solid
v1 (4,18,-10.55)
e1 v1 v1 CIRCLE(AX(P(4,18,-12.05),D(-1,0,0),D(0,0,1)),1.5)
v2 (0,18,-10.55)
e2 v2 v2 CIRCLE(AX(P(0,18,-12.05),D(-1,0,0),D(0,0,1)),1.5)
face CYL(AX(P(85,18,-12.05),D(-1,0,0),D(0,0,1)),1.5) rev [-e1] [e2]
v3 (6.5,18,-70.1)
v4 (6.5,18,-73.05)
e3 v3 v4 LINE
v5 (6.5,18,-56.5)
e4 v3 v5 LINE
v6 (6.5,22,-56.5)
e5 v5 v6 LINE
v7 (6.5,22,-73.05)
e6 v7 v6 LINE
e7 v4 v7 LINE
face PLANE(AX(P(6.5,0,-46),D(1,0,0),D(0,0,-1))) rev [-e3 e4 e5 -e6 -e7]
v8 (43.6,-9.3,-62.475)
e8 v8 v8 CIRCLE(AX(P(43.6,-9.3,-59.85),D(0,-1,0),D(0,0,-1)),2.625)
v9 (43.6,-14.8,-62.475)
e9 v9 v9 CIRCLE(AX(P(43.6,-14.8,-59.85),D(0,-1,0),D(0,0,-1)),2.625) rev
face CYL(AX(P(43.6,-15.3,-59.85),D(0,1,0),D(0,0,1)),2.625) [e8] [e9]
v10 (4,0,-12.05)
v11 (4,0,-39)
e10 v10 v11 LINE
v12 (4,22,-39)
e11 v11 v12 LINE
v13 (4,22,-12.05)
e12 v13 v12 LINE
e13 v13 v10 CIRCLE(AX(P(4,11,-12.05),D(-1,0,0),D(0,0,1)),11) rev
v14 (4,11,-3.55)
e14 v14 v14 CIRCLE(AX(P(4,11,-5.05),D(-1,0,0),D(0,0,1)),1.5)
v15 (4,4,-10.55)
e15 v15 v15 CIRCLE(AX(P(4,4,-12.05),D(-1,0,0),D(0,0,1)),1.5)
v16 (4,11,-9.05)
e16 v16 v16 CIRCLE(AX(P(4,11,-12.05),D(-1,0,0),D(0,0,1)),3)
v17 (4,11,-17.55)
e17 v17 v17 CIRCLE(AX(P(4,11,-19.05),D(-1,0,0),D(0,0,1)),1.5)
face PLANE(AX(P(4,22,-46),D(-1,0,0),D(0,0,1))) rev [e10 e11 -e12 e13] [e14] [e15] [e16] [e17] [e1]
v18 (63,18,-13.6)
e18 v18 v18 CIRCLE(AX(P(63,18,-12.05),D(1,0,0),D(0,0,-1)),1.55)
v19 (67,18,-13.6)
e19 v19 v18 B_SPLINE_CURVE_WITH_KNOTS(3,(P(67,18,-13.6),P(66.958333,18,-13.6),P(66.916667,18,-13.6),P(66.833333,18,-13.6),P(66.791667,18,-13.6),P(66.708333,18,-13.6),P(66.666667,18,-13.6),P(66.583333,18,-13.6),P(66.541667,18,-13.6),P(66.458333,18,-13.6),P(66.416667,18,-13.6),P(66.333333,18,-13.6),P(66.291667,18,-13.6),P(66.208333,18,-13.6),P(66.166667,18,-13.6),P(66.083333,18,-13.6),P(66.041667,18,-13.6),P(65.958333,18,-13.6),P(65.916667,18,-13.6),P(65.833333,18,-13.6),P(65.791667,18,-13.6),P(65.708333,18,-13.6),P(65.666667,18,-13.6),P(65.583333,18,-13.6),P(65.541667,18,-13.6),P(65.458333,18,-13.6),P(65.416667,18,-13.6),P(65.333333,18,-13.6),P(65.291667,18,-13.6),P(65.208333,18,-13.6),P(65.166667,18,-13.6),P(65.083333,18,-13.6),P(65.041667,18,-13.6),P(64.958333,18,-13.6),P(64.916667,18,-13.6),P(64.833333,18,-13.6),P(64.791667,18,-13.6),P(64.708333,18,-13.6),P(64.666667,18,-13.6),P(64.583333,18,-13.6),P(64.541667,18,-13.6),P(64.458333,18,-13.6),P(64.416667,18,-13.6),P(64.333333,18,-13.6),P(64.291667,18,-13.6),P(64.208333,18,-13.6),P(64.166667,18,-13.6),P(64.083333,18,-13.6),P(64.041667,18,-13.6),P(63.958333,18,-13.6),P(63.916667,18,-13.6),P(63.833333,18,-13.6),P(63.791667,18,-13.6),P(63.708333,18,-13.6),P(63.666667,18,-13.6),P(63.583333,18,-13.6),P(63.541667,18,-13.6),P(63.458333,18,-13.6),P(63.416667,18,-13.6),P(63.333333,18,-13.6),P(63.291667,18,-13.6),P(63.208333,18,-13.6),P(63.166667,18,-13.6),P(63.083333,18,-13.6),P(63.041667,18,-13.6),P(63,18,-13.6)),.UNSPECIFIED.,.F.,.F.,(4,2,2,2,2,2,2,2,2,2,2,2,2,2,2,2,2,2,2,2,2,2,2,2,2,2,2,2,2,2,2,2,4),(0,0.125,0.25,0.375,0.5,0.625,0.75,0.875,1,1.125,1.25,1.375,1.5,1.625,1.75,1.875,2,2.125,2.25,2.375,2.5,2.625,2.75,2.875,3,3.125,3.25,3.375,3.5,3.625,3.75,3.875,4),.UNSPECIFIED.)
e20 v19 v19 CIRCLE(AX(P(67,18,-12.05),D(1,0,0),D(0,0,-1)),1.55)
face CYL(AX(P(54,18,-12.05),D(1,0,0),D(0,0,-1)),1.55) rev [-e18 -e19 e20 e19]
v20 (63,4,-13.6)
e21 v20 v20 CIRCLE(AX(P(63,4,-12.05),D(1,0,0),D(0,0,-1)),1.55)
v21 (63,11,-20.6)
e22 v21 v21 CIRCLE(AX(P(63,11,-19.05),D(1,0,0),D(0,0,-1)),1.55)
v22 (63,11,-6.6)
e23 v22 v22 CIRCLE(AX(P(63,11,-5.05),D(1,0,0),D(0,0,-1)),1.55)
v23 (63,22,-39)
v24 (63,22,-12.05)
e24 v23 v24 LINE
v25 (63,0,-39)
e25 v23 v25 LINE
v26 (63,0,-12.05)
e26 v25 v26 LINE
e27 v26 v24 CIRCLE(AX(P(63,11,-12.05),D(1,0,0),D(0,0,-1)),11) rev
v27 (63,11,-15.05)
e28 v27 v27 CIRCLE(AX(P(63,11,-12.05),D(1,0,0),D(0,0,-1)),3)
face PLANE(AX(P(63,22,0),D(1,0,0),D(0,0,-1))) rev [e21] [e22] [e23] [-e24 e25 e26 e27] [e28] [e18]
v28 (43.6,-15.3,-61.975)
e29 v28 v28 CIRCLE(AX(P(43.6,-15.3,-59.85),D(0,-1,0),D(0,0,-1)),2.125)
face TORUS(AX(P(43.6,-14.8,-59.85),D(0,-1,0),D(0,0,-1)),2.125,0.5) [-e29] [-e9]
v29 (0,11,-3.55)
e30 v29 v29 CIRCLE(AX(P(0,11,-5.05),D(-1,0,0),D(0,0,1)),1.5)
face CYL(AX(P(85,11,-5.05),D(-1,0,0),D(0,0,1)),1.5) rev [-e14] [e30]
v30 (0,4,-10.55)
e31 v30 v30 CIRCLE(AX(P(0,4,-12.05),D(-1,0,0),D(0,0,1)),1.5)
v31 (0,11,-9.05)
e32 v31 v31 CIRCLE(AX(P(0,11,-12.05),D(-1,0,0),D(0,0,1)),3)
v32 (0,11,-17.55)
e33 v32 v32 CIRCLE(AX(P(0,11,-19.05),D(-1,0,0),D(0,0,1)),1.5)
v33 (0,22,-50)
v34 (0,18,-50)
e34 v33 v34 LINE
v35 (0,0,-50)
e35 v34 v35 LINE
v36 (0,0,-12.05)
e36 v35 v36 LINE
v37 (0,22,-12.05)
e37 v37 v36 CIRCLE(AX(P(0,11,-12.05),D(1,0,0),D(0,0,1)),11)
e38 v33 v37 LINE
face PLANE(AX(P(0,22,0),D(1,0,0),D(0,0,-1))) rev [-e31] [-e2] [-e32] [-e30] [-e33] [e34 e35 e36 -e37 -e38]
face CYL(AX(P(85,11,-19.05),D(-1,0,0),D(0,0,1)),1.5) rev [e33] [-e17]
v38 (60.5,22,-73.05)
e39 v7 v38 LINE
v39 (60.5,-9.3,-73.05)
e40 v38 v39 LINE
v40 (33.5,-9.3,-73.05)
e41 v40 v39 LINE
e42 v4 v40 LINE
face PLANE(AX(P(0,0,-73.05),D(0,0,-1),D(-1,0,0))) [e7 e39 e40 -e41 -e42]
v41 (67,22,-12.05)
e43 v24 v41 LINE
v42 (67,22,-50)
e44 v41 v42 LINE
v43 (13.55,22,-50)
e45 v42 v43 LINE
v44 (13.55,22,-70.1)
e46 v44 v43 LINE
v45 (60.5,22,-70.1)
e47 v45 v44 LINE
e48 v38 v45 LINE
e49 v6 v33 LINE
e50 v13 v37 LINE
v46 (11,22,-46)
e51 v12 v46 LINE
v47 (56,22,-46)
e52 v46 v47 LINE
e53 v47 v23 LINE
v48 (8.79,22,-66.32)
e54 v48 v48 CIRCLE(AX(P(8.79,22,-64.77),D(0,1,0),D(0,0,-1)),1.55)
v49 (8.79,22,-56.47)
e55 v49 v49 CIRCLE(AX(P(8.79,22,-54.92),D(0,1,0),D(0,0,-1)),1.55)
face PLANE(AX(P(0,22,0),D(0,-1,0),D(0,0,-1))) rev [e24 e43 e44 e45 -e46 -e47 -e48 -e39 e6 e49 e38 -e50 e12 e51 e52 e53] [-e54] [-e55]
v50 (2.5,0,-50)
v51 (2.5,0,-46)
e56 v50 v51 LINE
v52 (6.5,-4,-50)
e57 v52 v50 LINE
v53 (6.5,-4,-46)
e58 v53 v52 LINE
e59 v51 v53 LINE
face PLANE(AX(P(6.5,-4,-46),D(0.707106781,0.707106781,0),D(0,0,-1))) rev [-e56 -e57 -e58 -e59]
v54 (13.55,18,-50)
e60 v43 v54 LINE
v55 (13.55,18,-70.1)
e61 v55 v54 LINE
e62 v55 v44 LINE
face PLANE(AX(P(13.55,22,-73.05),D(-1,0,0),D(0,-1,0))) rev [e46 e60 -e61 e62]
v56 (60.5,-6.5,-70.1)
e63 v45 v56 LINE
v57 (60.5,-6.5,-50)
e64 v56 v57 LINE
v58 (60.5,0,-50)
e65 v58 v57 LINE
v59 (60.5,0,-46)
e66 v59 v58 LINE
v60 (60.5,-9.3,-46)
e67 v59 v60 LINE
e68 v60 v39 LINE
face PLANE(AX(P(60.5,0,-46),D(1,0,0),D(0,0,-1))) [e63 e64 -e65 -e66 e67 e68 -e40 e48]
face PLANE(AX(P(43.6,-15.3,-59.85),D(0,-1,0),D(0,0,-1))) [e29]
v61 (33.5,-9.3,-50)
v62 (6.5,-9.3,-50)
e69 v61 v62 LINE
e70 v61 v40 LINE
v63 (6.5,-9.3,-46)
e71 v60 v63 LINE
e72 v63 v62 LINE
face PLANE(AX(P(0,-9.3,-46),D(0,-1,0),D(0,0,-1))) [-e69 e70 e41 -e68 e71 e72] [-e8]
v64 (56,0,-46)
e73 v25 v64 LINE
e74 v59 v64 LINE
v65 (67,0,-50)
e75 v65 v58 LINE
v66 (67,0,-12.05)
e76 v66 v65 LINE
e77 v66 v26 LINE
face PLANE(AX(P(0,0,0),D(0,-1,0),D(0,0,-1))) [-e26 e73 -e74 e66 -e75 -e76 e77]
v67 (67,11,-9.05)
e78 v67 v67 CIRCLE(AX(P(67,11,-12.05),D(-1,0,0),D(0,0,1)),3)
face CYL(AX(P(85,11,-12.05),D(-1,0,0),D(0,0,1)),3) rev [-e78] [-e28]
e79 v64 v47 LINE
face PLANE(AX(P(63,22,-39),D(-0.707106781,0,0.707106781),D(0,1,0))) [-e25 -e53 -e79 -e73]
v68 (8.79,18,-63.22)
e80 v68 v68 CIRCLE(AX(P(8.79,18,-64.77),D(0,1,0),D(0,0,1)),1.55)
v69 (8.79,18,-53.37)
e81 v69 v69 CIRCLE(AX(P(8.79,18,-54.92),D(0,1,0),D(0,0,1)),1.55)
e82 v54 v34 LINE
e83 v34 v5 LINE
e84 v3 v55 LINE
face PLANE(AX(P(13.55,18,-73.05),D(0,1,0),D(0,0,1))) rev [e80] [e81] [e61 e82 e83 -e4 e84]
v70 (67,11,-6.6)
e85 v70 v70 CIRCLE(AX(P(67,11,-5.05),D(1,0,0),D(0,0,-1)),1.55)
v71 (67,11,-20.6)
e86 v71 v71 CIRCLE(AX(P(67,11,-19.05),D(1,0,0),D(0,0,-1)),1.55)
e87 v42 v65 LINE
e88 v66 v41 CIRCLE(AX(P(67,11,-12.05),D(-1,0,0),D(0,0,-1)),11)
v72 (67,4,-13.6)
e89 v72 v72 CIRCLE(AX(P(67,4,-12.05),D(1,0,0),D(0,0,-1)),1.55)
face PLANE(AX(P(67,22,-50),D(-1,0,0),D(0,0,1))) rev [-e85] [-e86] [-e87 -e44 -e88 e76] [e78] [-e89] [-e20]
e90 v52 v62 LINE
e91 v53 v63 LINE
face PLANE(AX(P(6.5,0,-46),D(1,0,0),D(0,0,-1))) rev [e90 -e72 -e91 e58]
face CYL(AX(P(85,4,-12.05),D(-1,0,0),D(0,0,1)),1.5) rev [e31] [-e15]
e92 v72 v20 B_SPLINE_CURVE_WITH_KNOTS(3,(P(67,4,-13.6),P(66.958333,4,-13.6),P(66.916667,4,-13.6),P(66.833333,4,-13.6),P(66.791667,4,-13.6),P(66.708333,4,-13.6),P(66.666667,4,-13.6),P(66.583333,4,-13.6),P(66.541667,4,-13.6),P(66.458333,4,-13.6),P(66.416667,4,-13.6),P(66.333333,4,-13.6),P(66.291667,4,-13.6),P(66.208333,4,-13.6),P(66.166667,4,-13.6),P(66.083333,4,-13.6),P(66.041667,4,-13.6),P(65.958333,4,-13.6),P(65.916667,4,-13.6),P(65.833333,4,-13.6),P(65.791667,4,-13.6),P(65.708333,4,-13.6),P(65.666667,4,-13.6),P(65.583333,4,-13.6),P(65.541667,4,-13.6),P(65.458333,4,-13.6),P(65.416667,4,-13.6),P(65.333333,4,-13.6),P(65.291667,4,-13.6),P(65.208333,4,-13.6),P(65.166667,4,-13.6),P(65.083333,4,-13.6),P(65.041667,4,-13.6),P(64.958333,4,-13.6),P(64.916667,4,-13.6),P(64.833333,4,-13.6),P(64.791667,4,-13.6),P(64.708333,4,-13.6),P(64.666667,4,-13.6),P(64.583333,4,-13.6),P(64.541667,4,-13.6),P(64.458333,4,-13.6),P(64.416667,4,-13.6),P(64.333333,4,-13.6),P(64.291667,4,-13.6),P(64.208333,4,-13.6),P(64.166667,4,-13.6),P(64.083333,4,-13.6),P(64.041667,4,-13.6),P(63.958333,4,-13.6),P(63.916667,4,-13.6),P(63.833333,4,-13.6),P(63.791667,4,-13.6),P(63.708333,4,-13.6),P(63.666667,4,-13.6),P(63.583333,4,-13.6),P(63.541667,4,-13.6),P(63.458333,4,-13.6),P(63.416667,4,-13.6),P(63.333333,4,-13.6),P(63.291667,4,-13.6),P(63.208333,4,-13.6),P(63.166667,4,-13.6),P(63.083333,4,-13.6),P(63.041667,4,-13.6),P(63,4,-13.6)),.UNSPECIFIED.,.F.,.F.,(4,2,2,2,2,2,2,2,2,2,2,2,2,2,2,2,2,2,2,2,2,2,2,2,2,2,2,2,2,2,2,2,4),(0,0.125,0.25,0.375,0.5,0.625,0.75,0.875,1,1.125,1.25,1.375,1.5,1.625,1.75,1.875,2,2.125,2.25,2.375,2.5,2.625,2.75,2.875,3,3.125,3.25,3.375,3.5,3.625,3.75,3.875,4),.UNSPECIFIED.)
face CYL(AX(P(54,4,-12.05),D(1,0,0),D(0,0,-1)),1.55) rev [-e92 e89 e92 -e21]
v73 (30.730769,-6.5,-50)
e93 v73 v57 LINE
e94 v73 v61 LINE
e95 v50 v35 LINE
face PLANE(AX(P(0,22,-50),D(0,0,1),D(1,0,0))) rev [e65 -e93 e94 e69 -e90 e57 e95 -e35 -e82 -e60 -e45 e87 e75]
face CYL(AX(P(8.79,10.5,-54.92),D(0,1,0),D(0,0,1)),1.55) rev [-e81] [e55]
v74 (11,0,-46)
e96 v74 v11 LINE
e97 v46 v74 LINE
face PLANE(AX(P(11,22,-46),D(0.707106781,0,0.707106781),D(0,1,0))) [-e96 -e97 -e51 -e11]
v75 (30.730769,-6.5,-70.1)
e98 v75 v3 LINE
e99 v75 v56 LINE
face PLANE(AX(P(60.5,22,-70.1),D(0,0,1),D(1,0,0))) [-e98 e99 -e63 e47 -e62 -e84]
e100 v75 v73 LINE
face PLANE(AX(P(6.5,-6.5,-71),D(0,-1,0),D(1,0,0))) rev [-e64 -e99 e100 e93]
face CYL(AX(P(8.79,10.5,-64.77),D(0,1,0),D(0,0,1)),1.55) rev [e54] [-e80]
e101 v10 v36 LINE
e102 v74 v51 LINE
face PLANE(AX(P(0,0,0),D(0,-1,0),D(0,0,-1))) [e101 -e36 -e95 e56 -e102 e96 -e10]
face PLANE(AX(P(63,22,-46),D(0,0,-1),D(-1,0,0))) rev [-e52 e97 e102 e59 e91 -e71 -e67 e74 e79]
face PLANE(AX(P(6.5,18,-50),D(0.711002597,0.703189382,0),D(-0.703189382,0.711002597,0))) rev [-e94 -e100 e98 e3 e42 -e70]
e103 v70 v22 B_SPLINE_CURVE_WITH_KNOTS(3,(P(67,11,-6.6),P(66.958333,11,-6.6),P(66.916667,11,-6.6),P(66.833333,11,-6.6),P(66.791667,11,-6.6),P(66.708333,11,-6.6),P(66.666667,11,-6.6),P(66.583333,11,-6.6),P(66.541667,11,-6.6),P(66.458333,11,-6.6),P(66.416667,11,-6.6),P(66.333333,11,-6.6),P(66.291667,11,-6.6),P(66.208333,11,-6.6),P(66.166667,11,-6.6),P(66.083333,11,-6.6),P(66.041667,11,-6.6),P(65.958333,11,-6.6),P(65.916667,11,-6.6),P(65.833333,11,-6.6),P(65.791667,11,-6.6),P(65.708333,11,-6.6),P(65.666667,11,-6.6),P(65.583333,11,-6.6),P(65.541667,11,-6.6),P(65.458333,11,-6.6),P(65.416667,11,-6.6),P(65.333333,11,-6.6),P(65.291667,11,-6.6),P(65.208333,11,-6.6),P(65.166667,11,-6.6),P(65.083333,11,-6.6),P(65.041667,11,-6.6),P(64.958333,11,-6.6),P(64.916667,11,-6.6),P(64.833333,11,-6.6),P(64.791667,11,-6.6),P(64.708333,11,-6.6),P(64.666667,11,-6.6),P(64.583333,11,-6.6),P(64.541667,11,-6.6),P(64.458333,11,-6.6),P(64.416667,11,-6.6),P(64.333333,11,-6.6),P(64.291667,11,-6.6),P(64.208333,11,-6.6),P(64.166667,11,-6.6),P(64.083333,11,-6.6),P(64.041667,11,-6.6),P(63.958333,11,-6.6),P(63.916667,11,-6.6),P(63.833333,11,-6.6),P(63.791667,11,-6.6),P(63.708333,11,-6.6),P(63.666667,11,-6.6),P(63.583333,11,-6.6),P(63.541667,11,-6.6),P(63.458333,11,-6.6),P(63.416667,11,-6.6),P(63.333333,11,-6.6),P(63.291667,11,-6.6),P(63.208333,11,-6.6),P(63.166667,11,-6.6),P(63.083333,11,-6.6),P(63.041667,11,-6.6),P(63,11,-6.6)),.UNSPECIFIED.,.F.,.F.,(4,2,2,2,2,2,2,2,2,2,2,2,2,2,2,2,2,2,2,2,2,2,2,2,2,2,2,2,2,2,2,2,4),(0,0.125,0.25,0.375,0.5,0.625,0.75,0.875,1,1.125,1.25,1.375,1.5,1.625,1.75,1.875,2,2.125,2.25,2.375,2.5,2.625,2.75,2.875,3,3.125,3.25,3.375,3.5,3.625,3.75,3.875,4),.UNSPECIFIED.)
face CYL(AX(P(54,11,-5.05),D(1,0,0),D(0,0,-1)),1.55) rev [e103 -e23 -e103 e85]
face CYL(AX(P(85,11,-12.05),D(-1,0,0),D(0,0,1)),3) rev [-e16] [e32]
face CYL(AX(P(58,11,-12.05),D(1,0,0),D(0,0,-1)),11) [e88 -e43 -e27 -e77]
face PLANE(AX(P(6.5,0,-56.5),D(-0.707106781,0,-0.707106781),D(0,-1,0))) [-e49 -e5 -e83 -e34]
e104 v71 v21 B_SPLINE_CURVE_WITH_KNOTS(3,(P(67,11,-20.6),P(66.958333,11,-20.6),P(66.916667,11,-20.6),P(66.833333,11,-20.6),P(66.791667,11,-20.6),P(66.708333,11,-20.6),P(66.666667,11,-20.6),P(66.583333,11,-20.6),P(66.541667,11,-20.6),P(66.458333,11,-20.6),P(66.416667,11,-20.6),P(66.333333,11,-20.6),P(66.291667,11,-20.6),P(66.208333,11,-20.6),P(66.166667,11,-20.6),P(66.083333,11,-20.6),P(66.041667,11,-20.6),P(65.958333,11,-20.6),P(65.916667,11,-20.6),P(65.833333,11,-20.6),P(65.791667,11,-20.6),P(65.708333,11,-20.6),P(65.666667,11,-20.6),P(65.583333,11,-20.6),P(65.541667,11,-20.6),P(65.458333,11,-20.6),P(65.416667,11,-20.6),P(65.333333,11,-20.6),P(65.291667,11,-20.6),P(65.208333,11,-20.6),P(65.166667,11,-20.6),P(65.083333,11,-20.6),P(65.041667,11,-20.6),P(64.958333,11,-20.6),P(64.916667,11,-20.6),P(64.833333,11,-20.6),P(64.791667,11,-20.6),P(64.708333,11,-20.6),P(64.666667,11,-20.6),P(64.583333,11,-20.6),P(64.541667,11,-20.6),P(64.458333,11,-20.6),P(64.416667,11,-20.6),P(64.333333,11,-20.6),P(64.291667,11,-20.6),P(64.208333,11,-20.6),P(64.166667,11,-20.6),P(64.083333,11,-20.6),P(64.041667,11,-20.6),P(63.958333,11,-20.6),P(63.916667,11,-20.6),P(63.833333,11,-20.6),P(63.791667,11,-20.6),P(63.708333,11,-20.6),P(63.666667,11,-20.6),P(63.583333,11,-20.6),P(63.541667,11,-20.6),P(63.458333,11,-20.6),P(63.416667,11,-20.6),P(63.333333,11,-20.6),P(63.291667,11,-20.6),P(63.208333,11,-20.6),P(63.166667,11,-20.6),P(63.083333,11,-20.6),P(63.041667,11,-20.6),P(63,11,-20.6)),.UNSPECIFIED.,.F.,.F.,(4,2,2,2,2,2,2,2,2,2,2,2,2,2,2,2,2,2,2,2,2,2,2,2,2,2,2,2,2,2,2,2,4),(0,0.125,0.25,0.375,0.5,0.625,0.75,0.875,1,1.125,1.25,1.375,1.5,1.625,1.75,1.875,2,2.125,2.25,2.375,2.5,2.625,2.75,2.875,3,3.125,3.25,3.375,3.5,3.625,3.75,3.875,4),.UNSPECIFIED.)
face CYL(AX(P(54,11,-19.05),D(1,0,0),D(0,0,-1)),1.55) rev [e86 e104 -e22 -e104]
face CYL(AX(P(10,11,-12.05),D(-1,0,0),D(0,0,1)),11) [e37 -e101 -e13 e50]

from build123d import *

# Parameters (mm, degrees)
BOSS_EXTRUDE1_DEPTH      = 22
SKETCH3_R                = 1.55
CUT_EXTRUDE1_DEPTH       = 30
CUT_EXTRUDE5_DEPTH       = 9
SKETCH11_R               = 1.55
CUT_EXTRUDE10_DEPTH      = 13
CUT_EXTRUDE11_START      = -10
CUT_EXTRUDE11_DEPTH      = 10
SKETCH13_R               = 3
SKETCH13_R_2             = 1.5
CUT_EXTRUDE12_DEPTH      = 85
FILLET1_SIZE             = 7
SKETCH14_W               = 54
SKETCH14_H               = 9.3
SKETCH14_W_2             = 7.05
SKETCH14_H_2             = 4
BOSS_EXTRUDE4_DEPTH      = 4
SKETCH17_W               = 7.05
SKETCH17_H               = 4
BOSS_EXTRUDE5_DEPTH      = 23.05
BOSS_EXTRUDE6_DEPTH      = 27.3
BOSS_EXTRUDE6_DEPTH_BACK = 4
SKETCH18_W               = 54
SKETCH18_H               = 2.95
SKETCH19_W               = 54
SKETCH19_H               = 2.8
BOSS_EXTRUDE7_DEPTH      = 21
FILLET2_SIZE             = 6.5
FILLET7_SIZE             = 4
SKETCH26_R               = 1.55
CUT_EXTRUDE18_DEPTH      = 11.5
CUT_EXTRUDE19_START      = -4
CUT_EXTRUDE19_OUTLINE_R  = 1.55
CUT_EXTRUDE19_DEPTH      = 4
CUT_EXTRUDE21_DEPTH      = 23.05
SKETCH31_R               = 2.625
BOSS_EXTRUDE8_DEPTH      = 6
FILLET8_R                = 0.5


# Read off the part's stored shape, not the designer's step: Cut-Extrude19
with BuildPart() as part:
    # Sketch1 → Boss-Extrude1 (new body)
    with BuildSketch(Plane(origin=(0, 0, 0), x_dir=(1, 0, 0), z_dir=(0, 1, 0))):
        Polygon((0, 0), (0, 50), (67, 50), (67, 0), (63, 0), (63, 46), (4, 46), (4, 0), align=None)
    extrude(amount=BOSS_EXTRUDE1_DEPTH)

    # Sketch3 → Cut-Extrude1 (cut)
    with BuildSketch(Plane(origin=(67, 0, 0), x_dir=(0, 0, -1), z_dir=(1, 0, 0))):
        with Locations((12.05, 11)):
            Circle(SKETCH3_R)
    extrude(amount=-CUT_EXTRUDE1_DEPTH, mode=Mode.SUBTRACT)

    # Sketch5 → Cut-Extrude5 (cut)
    with BuildSketch(Plane(origin=(67, 0, 0), x_dir=(0, 0, -1), z_dir=(1, 0, 0))):
        with BuildLine():
            Line((12.05, 22), (0, 22))
            Line((0, 22), (0, 0))
            Line((0, 0), (12.05, 0))
            ThreePointArc((12.05, 0), (1.05, 11), (12.05, 22))
        make_face()
    extrude(amount=-CUT_EXTRUDE5_DEPTH, mode=Mode.SUBTRACT)

    # Sketch11 → Cut-Extrude10 (cut)
    with BuildSketch(Plane(origin=(67, 0, 0), x_dir=(0, 0, -1), z_dir=(1, 0, 0))):
        with Locations((19.05, 11)):
            Circle(SKETCH11_R)
        with Locations((12.05, 18)):
            Circle(SKETCH11_R)
        with Locations((12.05, 4)):
            Circle(SKETCH11_R)
        with Locations((5.05, 11)):
            Circle(SKETCH11_R)
    extrude(amount=-CUT_EXTRUDE10_DEPTH, mode=Mode.SUBTRACT)

    # Sketch12 → Cut-Extrude11 (cut)
    with BuildSketch(Plane.ZY.offset(CUT_EXTRUDE11_START)):
        with BuildLine():
            Line((-12.05, 22), (0, 22))
            Line((0, 22), (0, 0))
            Line((0, 0), (-12.05, 0))
            ThreePointArc((-12.05, 0), (-1.05, 11), (-12.05, 22))
        make_face()
    extrude(amount=CUT_EXTRUDE11_DEPTH, mode=Mode.SUBTRACT)

    # Sketch13 → Cut-Extrude12 (cut)
    with BuildSketch(Plane.ZY):
        with Locations((-12.05, 11)):
            Circle(SKETCH13_R)
        with Locations((-19.05, 11)):
            Circle(SKETCH13_R_2)
        with Locations((-12.05, 4)):
            Circle(SKETCH13_R_2)
        with Locations((-5.05, 11)):
            Circle(SKETCH13_R_2)
        with Locations((-12.05, 18)):
            Circle(SKETCH13_R_2)
    extrude(amount=-CUT_EXTRUDE12_DEPTH, mode=Mode.SUBTRACT)

    # Fillet1
    fillet1_edges = [part.edges().sort_by_distance(p)[0] for p in [
        (63, 11, -46),
        (4, 11, -46),
    ]]
    chamfer(fillet1_edges, length=FILLET1_SIZE)

    # Sketch14 → Boss-Extrude4 (add)
    with BuildSketch(Plane(origin=(0, 0, -50), x_dir=(-1, 0, 0), z_dir=(0, 0, -1))):
        with Locations((-33.5, -4.65)):
            Rectangle(SKETCH14_W, SKETCH14_H)
        with Locations((-56.975, 20)):
            Rectangle(SKETCH14_W_2, SKETCH14_H_2)
        with Locations((-10.025, 20)):
            Rectangle(SKETCH14_W_2, SKETCH14_H_2)
    extrude(amount=-BOSS_EXTRUDE4_DEPTH)

    # Sketch17 → Boss-Extrude5 (add)
    with BuildSketch(Plane(origin=(0, 0, -50), x_dir=(-1, 0, 0), z_dir=(0, 0, -1))):
        with Locations((-56.975, 20)):
            Rectangle(SKETCH17_W, SKETCH17_H)
        with Locations((-10.025, 20)):
            Rectangle(SKETCH17_W, SKETCH17_H)
    extrude(amount=BOSS_EXTRUDE5_DEPTH)

    # Sketch18 → Boss-Extrude6 (add, two sides: drawn at the far end of the back side and taken through both)
    with BuildSketch(Plane.XZ.offset(-18).offset(-BOSS_EXTRUDE6_DEPTH_BACK)):
        with Locations((33.5, -71.575)):
            Rectangle(SKETCH18_W, SKETCH18_H)
    extrude(amount=BOSS_EXTRUDE6_DEPTH + BOSS_EXTRUDE6_DEPTH_BACK)

    # Sketch19 → Boss-Extrude7 (add)
    with BuildSketch(Plane(origin=(0, 0, -50), x_dir=(-1, 0, 0), z_dir=(0, 0, -1))):
        with Locations((-33.5, -7.9)):
            Rectangle(SKETCH19_W, SKETCH19_H)
    extrude(amount=BOSS_EXTRUDE7_DEPTH)

    # Fillet2
    fillet2_edges = [part.edges().sort_by_distance(p)[0] for p in [
        (60.5, 20, -50),
        (6.5, 20, -50),
    ]]
    chamfer(fillet2_edges, length=FILLET2_SIZE - 0.0001)  # a hair under: the kernel refuses the full size

    # Fillet7
    fillet7_edges = [part.edges().sort_by_distance(p)[0] for p in [
        (6.5, 0, -48),
    ]]
    chamfer(fillet7_edges, length=FILLET7_SIZE)

    # Sketch26 → Cut-Extrude18 (cut)
    with BuildSketch(Plane(origin=(0, 22, 0), x_dir=(1, 0, 0), z_dir=(0, 1, 0))):
        with Locations(Location((58.21, 64.77, 0), (0, 0, 270))):
            Circle(SKETCH26_R)
        with Locations(Location((58.21, 54.92, 0), (0, 0, 270))):
            Circle(SKETCH26_R)
        with Locations(Location((8.79, 54.92, 0), (0, 0, 270))):
            Circle(SKETCH26_R)
        with Locations(Location((8.79, 64.77, 0), (0, 0, 270))):
            Circle(SKETCH26_R)
    extrude(amount=-CUT_EXTRUDE18_DEPTH, mode=Mode.SUBTRACT)

    # Cut-Extrude19 outline → Cut-Extrude19 (cut)
    with BuildSketch(Plane(origin=(0, 22, 0), x_dir=(1, 0, 0), z_dir=(0, 1, 0)).offset(CUT_EXTRUDE19_START)):
        Polygon((53.45, 70.1), (53.45, 50), (67, 50), (60.5, 56.5), (60.5, 70.1), align=None)
        with Locations((58.21, 54.92)):
            Circle(CUT_EXTRUDE19_OUTLINE_R, mode=Mode.SUBTRACT)
        with Locations((58.21, 64.77)):
            Circle(CUT_EXTRUDE19_OUTLINE_R, mode=Mode.SUBTRACT)
    extrude(amount=CUT_EXTRUDE19_DEPTH, mode=Mode.SUBTRACT)

    # Sketch30 → Cut-Extrude21 (cut)
    with BuildSketch(Plane(origin=(0, 0, -73.05), x_dir=(-1, 0, 0), z_dir=(0, 0, -1))):
        Polygon((-6.5, 18), (-33.5, -9.3), (-6.5, -9.3), align=None)
    extrude(amount=-CUT_EXTRUDE21_DEPTH, mode=Mode.SUBTRACT)

    # Sketch31 → Boss-Extrude8 (add)
    with BuildSketch(Plane.XZ.offset(9.3)):
        with Locations(Location((43.6, -59.85, 0), (0, 0, 270))):
            Circle(SKETCH31_R)
    extrude(amount=BOSS_EXTRUDE8_DEPTH)

    # Fillet8
    fillet8_edges = [part.edges().sort_by_distance(p)[0] for p in [
        (43.6, -15.3, -57.225),
    ]]
    fillet(fillet8_edges, radius=FILLET8_R)


solid = part.part
